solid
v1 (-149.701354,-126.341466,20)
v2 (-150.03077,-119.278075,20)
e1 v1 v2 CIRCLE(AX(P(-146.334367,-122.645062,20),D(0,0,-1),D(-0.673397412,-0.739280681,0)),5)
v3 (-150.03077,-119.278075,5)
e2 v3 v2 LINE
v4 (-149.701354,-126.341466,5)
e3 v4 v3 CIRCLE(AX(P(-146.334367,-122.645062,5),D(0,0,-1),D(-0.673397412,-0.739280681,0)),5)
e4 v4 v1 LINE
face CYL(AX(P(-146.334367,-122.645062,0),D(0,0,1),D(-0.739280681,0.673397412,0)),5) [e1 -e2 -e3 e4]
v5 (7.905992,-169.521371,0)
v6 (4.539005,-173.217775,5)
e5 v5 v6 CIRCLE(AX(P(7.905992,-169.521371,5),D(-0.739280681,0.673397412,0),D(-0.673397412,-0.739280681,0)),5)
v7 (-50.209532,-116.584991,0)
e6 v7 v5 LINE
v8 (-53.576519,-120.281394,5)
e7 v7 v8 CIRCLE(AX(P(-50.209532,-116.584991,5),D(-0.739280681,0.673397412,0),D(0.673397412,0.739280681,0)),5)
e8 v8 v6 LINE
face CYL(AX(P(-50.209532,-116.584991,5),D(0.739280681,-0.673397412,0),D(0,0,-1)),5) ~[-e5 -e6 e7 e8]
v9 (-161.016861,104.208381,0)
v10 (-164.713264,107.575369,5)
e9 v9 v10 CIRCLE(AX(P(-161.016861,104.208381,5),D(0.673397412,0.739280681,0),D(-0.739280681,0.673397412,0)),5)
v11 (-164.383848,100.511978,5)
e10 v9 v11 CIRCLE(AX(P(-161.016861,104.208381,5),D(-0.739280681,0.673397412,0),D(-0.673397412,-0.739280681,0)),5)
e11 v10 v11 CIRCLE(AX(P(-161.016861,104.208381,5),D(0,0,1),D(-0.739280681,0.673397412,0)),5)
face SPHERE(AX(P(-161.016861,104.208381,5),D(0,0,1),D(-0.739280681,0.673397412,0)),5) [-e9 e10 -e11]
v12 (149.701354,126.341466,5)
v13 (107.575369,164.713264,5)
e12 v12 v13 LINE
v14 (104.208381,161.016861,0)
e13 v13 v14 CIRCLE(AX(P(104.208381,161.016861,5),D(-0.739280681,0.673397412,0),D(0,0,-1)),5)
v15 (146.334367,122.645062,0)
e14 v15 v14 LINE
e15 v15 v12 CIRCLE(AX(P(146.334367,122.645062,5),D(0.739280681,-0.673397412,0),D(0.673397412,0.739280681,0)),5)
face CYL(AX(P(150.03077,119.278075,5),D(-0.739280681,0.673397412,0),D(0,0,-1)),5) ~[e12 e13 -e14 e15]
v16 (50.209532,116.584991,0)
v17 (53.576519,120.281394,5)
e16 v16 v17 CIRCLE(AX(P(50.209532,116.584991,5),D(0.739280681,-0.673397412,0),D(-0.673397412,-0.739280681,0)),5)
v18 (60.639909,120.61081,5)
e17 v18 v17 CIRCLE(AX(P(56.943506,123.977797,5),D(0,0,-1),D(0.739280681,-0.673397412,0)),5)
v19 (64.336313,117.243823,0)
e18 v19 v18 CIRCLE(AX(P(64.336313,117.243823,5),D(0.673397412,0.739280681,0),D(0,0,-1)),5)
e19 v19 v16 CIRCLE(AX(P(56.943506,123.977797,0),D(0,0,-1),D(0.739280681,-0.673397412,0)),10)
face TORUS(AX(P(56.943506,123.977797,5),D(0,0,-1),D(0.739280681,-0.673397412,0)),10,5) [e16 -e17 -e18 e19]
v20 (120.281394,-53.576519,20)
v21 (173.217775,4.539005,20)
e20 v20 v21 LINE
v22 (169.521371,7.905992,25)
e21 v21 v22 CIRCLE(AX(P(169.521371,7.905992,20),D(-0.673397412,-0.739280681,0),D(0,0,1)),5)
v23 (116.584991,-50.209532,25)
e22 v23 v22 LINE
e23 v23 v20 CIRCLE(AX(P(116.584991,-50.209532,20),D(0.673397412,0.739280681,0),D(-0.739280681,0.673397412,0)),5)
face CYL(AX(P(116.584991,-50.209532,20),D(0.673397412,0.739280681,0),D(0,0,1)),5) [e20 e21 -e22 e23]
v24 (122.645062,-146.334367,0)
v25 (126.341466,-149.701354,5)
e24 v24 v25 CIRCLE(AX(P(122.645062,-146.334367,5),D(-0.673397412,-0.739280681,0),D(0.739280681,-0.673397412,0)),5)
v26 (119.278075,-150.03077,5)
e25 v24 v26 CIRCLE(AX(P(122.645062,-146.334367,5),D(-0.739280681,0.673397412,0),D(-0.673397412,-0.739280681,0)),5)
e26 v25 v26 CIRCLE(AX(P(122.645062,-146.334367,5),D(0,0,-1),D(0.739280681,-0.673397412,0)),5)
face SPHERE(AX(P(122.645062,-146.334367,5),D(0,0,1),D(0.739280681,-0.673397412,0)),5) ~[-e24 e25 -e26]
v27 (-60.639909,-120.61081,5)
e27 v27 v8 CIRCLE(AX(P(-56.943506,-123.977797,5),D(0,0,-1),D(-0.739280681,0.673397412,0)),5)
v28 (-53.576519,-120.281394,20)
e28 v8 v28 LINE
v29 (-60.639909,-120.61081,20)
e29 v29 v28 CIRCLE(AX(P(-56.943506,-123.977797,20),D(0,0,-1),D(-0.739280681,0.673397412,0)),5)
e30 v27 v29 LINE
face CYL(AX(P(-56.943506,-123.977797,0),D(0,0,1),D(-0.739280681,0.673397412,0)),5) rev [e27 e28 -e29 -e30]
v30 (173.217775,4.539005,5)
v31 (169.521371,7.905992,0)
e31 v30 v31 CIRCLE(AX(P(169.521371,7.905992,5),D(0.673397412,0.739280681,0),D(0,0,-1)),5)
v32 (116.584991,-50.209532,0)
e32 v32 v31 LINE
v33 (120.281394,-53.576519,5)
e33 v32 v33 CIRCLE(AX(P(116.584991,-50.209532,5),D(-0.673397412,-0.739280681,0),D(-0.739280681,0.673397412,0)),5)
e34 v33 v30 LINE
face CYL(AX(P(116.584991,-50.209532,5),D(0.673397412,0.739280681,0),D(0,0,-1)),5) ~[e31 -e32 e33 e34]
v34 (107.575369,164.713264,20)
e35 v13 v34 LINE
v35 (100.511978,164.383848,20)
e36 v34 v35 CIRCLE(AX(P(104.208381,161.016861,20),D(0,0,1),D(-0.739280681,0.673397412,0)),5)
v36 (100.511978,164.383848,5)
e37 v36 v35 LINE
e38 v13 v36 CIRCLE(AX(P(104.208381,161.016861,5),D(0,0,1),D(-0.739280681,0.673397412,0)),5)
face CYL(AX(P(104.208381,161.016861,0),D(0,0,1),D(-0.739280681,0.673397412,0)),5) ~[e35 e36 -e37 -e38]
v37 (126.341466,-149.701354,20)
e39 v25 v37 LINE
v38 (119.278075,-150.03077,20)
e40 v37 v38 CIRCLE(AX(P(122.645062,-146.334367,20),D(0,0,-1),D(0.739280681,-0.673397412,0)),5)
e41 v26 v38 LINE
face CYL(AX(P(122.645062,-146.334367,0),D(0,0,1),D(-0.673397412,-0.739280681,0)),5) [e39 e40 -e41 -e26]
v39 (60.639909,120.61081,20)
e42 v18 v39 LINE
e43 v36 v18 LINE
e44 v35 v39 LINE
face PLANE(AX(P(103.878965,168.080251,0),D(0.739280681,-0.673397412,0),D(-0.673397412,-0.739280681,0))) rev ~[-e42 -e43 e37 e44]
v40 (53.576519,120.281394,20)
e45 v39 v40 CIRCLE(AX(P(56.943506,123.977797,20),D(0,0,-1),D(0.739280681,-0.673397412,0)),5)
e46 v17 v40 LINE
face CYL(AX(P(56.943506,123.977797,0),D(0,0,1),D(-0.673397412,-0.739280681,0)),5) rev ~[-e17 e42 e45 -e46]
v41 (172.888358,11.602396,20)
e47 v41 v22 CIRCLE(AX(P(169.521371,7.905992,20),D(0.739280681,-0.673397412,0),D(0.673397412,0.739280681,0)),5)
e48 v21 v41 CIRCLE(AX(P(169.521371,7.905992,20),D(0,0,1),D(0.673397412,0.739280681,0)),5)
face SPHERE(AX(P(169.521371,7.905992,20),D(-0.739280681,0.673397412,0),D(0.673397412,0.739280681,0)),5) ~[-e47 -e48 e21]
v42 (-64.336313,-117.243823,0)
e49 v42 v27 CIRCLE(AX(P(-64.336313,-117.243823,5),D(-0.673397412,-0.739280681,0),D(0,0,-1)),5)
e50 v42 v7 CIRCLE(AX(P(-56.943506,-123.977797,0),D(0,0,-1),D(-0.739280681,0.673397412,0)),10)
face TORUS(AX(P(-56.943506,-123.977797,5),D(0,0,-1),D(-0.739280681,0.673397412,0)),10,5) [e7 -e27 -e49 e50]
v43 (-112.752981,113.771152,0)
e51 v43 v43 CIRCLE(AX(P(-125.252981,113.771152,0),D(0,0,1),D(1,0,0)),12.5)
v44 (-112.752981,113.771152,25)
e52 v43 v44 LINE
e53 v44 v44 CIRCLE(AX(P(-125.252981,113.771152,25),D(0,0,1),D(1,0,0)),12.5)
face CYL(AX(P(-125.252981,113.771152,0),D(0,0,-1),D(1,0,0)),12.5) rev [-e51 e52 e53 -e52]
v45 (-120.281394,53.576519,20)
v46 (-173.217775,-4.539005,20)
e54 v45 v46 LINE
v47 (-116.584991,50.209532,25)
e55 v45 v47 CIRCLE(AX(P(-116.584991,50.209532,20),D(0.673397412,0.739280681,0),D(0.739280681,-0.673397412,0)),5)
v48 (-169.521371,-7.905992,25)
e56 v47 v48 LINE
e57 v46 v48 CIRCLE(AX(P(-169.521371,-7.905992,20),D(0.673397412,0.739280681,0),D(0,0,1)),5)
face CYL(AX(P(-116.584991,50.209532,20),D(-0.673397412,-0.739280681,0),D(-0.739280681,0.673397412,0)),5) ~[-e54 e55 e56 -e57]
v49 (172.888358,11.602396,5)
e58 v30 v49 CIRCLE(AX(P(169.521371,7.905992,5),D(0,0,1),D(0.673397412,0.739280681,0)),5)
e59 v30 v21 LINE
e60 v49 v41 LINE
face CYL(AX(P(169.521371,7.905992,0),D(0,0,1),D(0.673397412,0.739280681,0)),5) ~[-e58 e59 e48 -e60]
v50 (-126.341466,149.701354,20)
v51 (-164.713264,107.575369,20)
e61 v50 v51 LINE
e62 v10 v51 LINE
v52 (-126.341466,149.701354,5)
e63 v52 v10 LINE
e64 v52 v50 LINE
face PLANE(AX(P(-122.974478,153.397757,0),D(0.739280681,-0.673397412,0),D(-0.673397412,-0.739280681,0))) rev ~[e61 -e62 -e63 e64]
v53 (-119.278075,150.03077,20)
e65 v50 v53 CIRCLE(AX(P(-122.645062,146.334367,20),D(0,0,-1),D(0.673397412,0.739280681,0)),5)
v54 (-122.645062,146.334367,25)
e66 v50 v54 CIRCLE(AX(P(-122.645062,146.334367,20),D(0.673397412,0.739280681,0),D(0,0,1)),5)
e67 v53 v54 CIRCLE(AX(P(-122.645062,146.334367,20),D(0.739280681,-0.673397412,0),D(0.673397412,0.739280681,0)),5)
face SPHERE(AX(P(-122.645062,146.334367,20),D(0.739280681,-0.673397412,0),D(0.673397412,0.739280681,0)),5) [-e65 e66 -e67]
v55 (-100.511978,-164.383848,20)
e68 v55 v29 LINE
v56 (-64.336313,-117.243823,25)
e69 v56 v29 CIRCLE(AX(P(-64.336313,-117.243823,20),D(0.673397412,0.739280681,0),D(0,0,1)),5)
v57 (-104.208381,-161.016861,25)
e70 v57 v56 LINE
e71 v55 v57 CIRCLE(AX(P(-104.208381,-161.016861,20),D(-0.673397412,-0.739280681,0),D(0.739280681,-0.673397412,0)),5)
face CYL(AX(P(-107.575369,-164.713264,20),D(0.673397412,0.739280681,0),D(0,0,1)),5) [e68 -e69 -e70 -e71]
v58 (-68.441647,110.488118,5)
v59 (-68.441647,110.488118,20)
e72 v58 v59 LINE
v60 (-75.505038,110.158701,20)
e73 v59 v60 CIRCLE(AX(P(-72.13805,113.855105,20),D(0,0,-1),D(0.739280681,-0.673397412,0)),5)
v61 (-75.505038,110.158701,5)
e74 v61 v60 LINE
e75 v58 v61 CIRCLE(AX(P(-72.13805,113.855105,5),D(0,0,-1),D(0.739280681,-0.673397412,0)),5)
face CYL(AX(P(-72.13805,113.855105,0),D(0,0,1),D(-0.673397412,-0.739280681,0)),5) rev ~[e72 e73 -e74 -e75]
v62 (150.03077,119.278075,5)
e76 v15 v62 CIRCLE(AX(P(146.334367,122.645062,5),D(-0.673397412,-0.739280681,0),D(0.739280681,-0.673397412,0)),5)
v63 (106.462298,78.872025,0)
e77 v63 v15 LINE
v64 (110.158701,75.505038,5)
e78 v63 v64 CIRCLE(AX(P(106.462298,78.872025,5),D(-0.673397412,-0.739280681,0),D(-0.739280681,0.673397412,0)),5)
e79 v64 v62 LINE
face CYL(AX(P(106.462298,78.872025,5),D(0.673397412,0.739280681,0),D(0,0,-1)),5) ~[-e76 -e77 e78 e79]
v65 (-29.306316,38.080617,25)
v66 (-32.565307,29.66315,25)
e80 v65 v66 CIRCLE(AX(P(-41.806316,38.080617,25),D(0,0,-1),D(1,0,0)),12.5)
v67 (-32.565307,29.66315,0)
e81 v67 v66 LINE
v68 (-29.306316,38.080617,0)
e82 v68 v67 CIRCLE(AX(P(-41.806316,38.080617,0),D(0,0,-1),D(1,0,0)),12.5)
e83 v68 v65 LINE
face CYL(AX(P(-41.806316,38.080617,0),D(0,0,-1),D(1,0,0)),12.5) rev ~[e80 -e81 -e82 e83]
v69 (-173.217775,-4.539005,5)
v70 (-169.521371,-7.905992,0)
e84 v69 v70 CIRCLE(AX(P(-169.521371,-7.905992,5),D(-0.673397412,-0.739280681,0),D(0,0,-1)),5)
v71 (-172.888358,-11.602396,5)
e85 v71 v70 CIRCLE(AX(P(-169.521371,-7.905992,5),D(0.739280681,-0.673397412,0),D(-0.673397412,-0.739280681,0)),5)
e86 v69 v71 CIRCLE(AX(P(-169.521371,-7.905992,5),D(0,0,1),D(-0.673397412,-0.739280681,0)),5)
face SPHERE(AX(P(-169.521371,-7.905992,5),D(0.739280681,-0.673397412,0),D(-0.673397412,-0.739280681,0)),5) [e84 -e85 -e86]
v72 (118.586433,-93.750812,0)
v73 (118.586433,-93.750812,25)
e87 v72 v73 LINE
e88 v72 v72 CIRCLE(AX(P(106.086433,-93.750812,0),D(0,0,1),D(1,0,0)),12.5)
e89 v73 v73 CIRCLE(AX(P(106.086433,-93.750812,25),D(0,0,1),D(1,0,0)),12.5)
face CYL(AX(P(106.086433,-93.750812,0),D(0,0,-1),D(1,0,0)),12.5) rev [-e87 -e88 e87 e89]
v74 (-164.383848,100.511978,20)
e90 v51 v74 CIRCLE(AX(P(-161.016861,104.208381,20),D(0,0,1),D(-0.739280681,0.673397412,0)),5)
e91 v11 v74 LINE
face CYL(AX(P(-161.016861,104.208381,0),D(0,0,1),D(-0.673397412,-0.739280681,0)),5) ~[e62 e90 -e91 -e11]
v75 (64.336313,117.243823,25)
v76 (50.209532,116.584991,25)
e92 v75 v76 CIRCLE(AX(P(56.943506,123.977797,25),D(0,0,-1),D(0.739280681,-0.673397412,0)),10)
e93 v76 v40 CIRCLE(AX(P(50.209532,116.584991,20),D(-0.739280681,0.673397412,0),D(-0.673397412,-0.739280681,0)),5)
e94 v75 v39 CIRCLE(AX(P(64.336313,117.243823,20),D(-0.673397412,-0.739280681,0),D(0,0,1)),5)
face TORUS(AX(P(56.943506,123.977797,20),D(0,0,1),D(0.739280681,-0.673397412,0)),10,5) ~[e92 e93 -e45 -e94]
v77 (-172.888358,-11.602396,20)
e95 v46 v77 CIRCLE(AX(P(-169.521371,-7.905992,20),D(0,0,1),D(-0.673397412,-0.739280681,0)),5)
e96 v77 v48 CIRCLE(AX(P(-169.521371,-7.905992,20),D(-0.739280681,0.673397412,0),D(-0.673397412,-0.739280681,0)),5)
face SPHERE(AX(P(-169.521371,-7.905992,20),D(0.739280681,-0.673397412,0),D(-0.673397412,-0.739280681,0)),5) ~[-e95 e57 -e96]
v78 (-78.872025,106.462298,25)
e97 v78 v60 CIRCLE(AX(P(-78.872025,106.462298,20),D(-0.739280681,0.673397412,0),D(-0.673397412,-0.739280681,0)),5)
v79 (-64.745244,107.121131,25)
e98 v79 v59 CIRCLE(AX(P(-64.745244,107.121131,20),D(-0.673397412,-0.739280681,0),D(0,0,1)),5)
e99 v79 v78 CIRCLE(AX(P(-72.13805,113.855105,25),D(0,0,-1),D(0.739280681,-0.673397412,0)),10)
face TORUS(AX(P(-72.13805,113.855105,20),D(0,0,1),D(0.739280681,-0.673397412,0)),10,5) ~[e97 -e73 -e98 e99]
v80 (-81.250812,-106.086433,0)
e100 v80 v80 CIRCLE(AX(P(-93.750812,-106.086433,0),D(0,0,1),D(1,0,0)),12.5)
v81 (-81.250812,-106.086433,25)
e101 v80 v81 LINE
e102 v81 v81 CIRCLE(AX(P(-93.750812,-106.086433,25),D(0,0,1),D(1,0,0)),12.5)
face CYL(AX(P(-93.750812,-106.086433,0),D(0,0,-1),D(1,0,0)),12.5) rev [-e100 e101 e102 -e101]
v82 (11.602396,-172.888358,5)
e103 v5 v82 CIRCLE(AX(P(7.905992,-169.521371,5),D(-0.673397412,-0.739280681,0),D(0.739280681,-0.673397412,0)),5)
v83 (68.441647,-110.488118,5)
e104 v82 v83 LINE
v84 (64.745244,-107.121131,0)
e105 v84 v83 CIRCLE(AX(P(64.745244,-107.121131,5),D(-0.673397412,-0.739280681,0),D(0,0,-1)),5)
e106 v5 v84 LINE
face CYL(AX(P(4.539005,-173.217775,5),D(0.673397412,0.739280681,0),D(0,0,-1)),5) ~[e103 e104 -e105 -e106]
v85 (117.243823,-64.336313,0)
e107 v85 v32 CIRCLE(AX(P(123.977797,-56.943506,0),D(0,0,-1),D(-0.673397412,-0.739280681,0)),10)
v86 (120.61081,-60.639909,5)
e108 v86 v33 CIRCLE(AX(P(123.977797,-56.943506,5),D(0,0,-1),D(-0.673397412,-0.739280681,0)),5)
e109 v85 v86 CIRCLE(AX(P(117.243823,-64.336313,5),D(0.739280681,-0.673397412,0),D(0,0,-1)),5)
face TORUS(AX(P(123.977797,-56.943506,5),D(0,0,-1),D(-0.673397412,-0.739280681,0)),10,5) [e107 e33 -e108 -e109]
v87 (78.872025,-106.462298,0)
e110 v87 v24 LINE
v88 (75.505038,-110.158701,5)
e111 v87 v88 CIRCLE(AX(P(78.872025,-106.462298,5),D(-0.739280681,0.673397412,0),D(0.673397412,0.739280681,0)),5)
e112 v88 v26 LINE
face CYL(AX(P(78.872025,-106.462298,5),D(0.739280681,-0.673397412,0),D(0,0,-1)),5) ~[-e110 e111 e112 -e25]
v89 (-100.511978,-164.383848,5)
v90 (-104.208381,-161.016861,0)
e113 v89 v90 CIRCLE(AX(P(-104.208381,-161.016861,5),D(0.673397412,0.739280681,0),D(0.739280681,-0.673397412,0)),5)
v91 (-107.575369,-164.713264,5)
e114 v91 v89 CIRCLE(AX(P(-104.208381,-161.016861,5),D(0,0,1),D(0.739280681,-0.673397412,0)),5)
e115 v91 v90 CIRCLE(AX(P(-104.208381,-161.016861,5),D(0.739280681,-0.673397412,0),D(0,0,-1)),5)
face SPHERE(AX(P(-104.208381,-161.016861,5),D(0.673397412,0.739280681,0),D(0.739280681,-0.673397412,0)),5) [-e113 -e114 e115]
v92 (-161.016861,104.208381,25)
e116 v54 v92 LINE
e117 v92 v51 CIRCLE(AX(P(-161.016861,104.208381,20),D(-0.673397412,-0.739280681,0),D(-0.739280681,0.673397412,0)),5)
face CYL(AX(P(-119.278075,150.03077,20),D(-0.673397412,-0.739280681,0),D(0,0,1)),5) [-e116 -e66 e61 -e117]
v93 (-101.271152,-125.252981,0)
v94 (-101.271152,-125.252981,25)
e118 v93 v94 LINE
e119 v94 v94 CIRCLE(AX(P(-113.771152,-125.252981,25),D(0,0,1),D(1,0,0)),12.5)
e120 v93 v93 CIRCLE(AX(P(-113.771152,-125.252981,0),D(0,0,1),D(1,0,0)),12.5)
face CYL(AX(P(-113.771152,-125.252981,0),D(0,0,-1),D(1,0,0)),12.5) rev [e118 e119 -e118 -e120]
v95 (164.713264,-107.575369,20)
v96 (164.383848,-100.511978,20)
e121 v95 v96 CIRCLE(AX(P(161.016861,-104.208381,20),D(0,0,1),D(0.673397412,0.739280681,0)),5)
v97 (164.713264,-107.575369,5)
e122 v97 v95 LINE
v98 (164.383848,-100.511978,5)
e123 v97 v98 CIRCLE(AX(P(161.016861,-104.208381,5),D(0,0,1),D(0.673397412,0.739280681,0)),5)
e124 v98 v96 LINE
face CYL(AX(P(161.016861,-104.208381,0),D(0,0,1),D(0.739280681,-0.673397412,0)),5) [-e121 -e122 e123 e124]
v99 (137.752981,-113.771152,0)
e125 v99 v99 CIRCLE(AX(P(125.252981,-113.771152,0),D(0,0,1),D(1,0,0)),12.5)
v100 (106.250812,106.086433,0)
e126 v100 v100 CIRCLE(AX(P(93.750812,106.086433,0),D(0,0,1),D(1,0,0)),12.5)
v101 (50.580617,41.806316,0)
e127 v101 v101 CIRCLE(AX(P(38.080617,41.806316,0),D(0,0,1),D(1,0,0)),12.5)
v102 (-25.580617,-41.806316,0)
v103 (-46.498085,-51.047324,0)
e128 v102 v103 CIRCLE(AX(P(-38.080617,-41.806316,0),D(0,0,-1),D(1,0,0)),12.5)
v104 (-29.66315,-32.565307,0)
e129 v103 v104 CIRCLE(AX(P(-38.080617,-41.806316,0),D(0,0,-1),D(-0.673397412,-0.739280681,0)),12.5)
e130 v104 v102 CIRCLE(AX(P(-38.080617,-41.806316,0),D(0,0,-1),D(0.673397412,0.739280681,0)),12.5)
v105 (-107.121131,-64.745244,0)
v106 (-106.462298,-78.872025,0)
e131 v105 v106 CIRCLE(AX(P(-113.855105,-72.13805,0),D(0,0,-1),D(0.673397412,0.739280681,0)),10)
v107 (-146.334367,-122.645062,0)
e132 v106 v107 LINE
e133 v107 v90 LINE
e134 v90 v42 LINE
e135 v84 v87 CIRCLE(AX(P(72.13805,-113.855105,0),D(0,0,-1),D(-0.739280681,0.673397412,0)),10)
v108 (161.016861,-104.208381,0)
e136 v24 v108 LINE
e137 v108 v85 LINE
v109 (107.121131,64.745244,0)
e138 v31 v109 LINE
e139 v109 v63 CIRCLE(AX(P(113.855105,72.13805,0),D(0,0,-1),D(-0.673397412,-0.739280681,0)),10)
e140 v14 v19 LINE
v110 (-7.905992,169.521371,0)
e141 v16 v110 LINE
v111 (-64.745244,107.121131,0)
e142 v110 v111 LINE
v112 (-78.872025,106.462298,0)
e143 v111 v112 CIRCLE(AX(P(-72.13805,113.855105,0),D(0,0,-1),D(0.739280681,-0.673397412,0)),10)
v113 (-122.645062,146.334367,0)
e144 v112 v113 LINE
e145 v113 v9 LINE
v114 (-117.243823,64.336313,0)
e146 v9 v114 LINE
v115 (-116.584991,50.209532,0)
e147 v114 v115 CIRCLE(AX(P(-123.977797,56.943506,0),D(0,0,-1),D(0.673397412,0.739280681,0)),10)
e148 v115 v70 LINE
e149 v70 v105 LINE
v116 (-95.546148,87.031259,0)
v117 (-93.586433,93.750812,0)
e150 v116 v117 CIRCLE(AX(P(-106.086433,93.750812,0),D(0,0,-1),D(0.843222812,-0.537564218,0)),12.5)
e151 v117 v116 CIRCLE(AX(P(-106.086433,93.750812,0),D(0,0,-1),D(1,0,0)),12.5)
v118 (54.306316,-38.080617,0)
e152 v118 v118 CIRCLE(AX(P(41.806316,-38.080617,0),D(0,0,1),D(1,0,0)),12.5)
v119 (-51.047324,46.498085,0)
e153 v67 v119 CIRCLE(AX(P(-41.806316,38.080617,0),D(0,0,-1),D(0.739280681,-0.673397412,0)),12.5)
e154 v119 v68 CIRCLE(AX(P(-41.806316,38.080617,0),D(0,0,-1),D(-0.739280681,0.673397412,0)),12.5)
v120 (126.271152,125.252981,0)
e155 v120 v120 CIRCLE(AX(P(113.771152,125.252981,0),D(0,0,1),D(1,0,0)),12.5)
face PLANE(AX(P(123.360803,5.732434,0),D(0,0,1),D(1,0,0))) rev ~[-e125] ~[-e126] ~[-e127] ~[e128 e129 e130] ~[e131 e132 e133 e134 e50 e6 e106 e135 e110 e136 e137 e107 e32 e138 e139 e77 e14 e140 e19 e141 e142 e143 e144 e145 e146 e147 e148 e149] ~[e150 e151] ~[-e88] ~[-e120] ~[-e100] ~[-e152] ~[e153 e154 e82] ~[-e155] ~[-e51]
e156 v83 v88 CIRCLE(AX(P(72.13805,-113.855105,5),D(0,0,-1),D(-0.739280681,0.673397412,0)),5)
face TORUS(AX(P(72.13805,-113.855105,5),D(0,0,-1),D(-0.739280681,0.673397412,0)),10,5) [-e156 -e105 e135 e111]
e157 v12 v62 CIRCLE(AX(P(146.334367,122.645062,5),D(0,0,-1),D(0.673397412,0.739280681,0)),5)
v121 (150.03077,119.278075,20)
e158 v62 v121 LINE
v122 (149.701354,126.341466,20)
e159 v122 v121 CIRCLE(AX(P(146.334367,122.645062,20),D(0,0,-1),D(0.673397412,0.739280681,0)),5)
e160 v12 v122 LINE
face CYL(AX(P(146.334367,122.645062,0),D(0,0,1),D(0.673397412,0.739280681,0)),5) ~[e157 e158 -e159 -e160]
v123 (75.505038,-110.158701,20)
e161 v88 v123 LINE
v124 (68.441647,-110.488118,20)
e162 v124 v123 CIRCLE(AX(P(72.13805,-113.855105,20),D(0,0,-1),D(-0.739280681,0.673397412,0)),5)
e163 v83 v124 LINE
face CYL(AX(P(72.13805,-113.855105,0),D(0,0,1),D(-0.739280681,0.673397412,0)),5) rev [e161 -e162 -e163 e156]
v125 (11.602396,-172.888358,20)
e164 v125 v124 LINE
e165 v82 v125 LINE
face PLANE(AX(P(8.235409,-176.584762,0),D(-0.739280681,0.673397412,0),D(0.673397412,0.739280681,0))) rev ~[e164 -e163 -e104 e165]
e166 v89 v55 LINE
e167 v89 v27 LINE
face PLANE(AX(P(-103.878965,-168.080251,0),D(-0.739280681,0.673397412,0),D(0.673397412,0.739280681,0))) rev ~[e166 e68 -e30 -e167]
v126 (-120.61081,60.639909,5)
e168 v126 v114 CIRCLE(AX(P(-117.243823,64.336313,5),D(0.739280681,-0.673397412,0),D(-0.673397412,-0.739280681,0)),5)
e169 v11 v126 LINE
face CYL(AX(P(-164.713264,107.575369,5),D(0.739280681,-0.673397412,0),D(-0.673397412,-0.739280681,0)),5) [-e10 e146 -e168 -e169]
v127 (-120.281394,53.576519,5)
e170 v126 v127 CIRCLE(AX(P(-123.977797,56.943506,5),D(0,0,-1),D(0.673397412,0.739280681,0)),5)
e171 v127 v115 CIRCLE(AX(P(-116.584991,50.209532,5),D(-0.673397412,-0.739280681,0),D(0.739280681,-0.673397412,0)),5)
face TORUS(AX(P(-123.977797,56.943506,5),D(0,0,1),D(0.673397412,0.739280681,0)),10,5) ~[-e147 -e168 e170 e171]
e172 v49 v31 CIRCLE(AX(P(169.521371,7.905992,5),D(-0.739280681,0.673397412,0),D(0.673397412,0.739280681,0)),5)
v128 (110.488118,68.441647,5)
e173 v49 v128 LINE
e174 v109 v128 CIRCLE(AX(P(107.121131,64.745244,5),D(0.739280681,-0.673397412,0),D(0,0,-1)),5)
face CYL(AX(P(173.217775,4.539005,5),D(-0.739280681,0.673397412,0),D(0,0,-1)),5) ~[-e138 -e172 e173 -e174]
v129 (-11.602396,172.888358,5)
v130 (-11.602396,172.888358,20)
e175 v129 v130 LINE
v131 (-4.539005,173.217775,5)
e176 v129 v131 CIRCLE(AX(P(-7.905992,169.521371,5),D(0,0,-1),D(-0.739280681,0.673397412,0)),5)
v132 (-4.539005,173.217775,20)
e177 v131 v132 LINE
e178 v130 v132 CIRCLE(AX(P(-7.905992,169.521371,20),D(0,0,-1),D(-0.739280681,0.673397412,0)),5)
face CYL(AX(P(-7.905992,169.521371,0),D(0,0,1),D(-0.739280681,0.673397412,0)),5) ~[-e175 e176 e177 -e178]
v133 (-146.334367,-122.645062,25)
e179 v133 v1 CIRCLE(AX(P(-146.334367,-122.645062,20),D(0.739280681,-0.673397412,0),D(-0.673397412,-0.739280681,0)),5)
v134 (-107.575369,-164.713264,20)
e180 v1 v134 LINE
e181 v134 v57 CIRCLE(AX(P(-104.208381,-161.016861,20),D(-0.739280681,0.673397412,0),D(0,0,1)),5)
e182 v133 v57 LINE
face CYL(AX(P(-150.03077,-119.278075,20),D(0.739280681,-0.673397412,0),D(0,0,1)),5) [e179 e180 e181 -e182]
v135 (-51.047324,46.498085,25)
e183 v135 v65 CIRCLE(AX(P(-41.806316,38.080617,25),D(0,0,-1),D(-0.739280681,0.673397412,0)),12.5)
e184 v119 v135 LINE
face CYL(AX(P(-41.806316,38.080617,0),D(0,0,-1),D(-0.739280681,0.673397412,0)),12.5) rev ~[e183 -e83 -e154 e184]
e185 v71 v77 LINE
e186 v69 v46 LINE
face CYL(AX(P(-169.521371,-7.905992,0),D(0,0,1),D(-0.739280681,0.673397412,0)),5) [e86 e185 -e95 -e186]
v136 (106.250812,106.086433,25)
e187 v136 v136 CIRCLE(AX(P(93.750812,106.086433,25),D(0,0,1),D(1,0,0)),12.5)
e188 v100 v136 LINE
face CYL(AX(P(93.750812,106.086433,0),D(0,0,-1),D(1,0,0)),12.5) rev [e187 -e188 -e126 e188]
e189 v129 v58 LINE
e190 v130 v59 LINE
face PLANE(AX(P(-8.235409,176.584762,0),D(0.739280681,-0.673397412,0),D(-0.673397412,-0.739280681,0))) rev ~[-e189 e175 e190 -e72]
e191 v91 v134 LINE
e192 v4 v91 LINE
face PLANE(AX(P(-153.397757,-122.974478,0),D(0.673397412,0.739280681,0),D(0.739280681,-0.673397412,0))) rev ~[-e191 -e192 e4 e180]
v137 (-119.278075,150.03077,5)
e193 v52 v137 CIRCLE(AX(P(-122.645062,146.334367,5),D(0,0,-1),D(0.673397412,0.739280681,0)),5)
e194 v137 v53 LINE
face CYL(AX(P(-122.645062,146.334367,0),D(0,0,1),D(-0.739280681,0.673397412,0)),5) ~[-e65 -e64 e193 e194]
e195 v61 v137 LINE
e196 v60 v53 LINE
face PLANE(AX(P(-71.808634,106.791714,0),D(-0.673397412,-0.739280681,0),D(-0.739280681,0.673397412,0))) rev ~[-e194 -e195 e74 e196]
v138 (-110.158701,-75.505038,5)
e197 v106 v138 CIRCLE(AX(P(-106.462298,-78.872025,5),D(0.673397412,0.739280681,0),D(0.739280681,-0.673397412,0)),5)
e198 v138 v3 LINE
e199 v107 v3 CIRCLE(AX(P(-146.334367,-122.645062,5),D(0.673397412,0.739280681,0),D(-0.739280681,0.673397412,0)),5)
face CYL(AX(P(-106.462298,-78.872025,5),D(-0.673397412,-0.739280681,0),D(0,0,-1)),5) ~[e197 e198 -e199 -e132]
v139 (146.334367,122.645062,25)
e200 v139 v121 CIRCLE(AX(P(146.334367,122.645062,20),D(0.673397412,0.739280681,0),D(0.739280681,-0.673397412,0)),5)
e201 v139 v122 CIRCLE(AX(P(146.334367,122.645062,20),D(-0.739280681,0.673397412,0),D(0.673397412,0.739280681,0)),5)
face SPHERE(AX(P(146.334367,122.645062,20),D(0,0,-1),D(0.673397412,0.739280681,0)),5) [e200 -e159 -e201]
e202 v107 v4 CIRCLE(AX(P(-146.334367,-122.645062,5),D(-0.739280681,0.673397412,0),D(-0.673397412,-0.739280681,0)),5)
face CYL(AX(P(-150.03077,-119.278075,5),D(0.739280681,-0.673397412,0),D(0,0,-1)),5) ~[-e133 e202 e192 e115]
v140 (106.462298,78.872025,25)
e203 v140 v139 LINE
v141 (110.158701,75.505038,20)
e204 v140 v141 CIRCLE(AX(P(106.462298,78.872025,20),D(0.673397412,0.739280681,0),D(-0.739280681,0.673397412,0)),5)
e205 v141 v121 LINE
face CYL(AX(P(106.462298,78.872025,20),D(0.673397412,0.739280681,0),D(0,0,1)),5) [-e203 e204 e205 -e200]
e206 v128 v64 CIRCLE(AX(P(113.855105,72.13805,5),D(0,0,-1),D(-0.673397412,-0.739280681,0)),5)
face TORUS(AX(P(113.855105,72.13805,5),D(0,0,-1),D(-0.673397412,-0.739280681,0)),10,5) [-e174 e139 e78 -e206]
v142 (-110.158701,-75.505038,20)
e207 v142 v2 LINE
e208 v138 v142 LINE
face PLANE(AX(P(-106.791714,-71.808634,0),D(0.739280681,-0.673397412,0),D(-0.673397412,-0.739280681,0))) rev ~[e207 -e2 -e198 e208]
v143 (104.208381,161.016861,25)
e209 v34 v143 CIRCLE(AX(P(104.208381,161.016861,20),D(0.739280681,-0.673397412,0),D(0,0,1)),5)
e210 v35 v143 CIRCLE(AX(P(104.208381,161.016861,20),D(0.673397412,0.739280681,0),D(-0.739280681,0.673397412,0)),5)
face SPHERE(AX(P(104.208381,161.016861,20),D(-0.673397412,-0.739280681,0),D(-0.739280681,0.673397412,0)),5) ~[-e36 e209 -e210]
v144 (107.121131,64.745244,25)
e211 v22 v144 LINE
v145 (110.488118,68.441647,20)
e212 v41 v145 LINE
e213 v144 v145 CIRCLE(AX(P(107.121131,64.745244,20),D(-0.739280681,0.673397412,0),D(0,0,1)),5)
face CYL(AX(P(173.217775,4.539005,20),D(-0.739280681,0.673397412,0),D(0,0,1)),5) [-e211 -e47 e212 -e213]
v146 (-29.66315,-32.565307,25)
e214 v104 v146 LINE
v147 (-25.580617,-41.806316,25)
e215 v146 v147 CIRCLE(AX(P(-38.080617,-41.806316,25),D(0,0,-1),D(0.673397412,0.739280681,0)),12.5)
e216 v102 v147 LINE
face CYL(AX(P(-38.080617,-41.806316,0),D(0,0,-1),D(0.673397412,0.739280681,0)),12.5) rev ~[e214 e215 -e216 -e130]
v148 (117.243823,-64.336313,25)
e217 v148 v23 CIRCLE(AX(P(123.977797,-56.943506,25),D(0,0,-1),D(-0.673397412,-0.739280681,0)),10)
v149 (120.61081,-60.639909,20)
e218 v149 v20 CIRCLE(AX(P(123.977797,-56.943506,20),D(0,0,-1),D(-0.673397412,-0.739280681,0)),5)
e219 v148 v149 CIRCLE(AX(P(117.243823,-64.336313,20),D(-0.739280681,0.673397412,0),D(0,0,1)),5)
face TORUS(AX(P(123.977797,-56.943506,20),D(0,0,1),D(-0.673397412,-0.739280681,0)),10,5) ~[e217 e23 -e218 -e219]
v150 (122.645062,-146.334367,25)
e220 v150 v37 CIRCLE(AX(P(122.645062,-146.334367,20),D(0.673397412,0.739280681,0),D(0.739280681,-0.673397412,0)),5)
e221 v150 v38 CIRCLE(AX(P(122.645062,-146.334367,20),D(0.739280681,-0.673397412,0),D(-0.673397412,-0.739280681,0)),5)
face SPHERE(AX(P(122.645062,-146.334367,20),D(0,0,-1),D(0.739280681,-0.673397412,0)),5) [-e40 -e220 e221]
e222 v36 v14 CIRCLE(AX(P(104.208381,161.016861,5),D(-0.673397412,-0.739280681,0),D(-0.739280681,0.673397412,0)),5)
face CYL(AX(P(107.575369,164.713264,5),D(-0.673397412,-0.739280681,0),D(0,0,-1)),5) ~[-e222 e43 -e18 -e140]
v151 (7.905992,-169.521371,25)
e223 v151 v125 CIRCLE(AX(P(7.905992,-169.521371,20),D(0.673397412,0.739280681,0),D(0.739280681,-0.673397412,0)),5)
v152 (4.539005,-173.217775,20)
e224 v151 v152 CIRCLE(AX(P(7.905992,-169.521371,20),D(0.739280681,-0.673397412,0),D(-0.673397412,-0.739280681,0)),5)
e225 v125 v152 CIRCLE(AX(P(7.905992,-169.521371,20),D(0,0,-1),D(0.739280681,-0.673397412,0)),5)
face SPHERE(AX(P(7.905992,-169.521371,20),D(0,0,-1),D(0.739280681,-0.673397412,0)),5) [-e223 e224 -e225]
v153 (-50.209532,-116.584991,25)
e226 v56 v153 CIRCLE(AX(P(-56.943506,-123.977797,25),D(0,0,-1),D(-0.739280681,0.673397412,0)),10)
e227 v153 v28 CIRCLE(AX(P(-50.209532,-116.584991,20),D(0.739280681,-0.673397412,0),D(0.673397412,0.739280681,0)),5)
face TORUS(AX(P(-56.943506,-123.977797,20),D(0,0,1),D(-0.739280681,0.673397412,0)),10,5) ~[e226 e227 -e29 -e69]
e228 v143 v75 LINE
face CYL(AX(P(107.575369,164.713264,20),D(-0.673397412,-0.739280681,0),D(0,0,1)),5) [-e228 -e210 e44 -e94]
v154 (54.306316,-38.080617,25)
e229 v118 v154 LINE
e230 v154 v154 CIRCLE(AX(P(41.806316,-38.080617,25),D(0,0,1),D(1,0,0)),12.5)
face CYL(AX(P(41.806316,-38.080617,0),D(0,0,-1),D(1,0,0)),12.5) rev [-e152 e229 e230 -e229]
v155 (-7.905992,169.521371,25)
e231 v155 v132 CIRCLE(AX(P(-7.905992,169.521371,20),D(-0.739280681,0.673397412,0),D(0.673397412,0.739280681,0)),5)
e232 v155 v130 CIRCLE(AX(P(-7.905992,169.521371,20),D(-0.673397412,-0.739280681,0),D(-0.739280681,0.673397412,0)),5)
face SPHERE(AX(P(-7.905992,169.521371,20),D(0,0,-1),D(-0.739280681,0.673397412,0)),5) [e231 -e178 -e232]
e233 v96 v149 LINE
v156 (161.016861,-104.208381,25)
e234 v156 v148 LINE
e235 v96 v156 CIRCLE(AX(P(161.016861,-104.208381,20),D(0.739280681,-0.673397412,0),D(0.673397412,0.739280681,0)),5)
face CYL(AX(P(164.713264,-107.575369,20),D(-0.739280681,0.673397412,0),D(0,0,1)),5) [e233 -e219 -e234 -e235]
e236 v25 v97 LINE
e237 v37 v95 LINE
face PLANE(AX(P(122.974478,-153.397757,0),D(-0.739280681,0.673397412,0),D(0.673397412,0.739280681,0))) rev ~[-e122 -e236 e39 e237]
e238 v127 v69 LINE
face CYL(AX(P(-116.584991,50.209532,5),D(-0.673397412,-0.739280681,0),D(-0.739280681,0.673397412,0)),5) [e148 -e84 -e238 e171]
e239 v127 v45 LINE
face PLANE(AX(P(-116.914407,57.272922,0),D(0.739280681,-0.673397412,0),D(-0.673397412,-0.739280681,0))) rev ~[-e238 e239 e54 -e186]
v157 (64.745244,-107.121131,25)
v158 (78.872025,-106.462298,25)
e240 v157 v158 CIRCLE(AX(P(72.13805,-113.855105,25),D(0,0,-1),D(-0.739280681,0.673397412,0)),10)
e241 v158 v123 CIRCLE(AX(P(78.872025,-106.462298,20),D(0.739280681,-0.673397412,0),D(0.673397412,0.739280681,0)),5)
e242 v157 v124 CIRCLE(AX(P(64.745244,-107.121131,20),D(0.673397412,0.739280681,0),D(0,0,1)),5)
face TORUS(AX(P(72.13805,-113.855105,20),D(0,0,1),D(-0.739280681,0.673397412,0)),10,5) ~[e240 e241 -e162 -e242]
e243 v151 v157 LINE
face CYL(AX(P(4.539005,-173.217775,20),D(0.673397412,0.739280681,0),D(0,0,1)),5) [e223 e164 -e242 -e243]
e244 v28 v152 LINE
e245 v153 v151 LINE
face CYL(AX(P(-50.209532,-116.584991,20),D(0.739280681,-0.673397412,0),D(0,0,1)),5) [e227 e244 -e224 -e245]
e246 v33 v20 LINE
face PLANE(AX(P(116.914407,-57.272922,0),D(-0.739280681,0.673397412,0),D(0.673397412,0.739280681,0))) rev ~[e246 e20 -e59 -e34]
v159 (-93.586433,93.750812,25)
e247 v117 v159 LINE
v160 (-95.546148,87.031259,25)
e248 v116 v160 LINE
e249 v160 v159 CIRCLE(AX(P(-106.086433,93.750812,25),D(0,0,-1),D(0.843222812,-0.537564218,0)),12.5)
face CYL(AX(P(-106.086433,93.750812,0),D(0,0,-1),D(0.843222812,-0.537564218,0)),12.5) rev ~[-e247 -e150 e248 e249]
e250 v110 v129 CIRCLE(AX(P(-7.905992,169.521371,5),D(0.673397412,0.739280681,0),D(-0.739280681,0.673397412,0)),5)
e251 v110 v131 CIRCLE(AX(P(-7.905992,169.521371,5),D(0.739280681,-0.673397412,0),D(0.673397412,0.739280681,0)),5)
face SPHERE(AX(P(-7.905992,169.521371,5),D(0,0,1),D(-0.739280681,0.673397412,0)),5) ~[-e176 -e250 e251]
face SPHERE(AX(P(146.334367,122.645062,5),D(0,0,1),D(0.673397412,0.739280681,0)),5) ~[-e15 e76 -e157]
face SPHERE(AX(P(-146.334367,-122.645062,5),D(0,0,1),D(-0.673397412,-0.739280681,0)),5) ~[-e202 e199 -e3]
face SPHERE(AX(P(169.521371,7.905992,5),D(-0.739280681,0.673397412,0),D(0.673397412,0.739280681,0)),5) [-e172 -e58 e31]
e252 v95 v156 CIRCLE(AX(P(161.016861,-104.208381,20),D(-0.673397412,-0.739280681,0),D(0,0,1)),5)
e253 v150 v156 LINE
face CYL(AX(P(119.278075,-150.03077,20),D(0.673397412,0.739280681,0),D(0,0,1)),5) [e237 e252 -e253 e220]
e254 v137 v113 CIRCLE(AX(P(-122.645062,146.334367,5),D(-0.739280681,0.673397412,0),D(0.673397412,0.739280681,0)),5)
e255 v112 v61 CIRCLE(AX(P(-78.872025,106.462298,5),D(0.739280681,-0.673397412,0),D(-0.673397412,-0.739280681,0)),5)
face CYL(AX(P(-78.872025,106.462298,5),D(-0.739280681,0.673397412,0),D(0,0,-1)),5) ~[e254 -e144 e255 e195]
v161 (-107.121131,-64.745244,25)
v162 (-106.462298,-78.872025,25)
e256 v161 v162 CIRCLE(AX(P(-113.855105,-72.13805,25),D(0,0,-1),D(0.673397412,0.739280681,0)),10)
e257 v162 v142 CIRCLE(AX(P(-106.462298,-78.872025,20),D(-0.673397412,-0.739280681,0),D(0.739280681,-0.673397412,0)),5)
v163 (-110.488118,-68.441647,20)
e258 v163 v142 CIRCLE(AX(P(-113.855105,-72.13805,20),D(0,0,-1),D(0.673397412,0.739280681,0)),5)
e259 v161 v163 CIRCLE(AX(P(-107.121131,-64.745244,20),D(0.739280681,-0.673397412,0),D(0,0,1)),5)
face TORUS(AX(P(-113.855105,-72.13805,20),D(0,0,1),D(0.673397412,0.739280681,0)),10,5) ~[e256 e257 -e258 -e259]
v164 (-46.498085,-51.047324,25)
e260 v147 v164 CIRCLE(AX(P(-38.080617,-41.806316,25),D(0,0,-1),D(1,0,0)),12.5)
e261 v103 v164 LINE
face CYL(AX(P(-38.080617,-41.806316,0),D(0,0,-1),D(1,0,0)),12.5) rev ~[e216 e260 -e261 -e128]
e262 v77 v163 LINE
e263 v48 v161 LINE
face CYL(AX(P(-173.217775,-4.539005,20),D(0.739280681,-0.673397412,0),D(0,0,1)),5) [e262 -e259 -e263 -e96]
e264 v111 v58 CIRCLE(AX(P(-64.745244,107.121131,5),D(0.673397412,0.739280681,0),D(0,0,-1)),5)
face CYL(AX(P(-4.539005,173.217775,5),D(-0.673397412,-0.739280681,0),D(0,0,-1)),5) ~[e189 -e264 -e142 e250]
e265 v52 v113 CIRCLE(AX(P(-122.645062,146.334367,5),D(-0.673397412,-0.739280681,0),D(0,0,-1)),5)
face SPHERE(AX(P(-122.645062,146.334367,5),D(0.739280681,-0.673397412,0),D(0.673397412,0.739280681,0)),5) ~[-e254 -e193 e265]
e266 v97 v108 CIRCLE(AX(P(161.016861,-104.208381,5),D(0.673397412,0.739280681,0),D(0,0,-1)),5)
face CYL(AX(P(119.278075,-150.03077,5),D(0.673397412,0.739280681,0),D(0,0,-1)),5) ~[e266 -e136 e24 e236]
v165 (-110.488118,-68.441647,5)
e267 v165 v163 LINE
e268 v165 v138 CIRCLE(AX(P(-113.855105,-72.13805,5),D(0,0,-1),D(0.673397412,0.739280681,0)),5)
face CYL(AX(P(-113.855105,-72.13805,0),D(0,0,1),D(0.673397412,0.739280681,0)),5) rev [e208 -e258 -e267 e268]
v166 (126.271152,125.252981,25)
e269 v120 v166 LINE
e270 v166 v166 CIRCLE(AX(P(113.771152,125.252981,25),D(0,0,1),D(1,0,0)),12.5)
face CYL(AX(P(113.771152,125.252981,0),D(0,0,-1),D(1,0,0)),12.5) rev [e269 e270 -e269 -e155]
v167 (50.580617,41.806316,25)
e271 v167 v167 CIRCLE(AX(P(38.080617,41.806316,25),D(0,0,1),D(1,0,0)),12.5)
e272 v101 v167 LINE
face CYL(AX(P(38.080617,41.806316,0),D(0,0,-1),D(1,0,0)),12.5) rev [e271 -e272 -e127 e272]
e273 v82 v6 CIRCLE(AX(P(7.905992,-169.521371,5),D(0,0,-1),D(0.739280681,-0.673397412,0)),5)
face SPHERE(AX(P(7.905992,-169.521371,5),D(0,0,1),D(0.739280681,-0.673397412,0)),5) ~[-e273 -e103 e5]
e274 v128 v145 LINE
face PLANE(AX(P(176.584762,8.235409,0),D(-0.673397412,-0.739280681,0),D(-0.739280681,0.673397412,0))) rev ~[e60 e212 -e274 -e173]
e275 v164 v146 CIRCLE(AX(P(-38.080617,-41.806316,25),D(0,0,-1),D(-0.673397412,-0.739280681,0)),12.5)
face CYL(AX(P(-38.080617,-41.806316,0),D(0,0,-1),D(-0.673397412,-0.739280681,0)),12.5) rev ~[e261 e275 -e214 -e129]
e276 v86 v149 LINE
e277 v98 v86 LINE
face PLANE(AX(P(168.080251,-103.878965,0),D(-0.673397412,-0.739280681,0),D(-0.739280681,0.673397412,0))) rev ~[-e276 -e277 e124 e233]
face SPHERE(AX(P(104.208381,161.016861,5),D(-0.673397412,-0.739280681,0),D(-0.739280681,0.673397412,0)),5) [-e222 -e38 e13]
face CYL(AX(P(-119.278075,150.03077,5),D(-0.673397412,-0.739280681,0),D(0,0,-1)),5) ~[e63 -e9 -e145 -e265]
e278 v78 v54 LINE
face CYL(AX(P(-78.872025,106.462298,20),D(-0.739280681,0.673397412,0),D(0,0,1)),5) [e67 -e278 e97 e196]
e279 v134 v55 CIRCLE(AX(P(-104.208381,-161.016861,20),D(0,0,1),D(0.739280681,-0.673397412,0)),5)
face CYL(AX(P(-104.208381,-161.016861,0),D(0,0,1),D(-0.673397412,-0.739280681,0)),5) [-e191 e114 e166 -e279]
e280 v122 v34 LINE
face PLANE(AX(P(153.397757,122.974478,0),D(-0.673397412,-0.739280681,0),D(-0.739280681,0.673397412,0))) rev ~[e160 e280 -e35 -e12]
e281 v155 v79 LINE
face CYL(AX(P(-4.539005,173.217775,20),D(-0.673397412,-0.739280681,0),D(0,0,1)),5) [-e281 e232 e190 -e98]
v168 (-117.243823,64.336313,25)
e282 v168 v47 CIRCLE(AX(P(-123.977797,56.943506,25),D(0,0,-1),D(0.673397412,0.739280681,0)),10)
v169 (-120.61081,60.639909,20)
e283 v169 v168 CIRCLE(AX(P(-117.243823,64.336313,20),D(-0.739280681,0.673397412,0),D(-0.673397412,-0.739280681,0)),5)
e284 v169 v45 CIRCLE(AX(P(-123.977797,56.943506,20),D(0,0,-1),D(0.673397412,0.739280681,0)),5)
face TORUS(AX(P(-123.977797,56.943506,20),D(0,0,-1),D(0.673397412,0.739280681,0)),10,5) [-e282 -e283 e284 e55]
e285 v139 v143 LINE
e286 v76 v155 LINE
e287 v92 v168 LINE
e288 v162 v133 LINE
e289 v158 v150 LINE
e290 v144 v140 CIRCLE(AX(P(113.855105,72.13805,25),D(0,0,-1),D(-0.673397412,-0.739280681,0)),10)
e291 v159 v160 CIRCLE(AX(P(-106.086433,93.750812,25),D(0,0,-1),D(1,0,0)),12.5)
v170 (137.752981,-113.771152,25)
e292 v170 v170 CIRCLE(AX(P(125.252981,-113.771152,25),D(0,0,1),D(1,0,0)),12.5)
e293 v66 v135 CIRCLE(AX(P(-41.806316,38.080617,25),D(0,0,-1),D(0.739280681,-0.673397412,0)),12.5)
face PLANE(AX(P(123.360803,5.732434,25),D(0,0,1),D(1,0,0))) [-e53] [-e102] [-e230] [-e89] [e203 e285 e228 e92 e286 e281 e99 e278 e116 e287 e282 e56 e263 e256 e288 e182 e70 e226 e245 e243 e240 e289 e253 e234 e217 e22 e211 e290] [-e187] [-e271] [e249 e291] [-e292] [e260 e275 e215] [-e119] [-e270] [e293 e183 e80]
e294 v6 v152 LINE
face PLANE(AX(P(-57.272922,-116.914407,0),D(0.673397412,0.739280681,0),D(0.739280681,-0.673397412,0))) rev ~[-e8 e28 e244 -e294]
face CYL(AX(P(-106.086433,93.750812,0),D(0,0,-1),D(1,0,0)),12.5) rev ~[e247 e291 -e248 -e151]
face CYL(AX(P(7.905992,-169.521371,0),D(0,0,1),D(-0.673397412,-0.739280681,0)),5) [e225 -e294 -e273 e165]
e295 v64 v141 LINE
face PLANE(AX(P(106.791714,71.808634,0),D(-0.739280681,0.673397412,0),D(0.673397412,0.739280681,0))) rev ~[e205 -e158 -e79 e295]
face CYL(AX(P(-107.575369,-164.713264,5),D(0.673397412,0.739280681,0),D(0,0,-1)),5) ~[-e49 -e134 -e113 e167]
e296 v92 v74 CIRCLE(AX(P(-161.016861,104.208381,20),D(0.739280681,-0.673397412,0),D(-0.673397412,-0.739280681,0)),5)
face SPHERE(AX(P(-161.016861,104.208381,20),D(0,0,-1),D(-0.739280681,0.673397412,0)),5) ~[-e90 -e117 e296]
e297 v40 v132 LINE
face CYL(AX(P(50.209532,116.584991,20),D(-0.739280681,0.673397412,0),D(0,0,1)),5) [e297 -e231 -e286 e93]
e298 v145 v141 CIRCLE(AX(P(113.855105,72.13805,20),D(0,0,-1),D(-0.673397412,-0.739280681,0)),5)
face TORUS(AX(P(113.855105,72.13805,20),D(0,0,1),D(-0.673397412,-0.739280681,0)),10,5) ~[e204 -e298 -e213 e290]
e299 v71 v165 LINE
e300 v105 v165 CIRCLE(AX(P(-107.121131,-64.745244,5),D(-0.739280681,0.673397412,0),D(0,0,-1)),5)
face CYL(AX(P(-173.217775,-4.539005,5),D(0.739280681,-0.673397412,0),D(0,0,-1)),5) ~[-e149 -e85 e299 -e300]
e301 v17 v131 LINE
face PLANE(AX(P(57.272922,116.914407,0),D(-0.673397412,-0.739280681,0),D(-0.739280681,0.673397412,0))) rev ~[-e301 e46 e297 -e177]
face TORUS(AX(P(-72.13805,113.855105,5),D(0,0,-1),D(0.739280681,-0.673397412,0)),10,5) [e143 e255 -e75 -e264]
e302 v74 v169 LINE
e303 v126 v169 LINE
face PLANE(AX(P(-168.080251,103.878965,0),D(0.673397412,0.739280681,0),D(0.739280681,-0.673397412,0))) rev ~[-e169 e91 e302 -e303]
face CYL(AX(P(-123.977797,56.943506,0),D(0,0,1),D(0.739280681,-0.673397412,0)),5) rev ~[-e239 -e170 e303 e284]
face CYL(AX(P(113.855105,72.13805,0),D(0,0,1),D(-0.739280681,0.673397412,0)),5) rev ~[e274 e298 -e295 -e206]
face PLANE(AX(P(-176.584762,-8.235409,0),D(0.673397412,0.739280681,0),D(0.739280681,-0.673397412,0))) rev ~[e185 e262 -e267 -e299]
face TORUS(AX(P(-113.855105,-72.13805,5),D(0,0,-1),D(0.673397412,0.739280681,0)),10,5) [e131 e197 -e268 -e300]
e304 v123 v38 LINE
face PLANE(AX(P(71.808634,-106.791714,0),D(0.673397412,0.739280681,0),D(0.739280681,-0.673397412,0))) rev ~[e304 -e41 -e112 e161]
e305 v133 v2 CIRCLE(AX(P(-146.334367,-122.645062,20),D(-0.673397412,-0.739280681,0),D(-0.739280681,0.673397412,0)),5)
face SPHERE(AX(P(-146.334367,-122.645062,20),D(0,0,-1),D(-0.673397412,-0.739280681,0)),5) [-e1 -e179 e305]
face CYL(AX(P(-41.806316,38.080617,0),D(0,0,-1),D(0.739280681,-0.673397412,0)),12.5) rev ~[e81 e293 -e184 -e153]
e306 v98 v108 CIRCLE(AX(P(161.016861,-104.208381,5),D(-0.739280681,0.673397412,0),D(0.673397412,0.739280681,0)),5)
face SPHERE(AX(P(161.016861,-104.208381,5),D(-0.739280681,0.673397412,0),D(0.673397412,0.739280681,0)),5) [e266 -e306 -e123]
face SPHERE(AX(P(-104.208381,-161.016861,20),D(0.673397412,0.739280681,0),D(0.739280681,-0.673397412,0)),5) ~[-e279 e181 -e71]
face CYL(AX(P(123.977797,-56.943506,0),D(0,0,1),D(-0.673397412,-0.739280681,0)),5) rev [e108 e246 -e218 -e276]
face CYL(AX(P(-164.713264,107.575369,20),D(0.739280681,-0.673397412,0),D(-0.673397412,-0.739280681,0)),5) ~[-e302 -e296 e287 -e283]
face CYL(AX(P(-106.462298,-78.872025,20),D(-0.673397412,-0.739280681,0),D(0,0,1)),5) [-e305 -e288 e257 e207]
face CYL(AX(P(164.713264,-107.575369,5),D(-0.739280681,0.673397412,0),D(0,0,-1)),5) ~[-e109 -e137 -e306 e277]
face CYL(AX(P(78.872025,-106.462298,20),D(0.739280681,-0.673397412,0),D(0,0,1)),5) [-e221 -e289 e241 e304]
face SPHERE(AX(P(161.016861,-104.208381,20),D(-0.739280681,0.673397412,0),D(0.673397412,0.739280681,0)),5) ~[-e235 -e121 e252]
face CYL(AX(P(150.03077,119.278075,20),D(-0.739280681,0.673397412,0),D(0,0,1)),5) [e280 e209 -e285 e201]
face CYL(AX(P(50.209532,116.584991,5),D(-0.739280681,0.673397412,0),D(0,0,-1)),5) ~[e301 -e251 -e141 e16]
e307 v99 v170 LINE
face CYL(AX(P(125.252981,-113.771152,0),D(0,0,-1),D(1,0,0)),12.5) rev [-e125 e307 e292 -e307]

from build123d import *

# Parameters (mm, degrees)
F0_R     = 12.5
F1_DEPTH = 25
F2_F1_R  = 5
F2_F2_R  = 5


with BuildPart() as f1:
    # F0 (on Top) → F1 (new body)
    with BuildSketch(Plane.XY):
        with BuildLine():
            ThreePointArc((84.1746765519, 92.4100850957), (114.3390453191, 50.5131934796), (125, 0))
            ThreePointArc((125, 0), (116.5681360927, -45.131692278), (92.410085634, -84.1746759609))
            Line((92.410085634, -84.1746759609), (116.9144070246, -57.2729221618))
            Line((116.9144070246, -57.2729221618), (176.5847616479, 8.2354085359))
            Line((176.5847616479, 8.2354085359), (106.7917142693, 71.8086341541))
            Line((106.7917142693, 71.8086341541), (84.1746765519, 92.4100850957))
        make_face()
        with BuildLine():
            ThreePointArc((-92.410085938, 84.1746756271), (-5.8233138519, 124.864282386), (84.1746765519, 92.4100850957))
            Line((84.1746765519, 92.4100850957), (57.2729221618, 116.9144070246))
            Line((57.2729221618, 116.9144070246), (-8.2354085359, 176.5847616479))
            Line((-8.2354085359, 176.5847616479), (-71.8086341541, 106.7917142693))
            Line((-71.8086341541, 106.7917142693), (-92.410085938, 84.1746756271))
        make_face()
        Polygon((57.2729221618, 116.9144070246), (84.1746765519, 92.4100850957), (106.7917142693, 71.8086341541), (153.3977572181, 122.9744784544), (103.8789651106, 168.0802513249), align=None)
        with Locations((93.7508121133, 106.0864329338)):
            Circle(F0_R, mode=Mode.SUBTRACT)
        with Locations((113.7711524508, 125.2529812725)):
            Circle(F0_R, mode=Mode.SUBTRACT)
        with BuildLine():
            Line((71.8086341541, -106.7917142693), (92.410085634, -84.1746759609))
            ThreePointArc((92.410085634, -84.1746759609), (5.8233127337, -124.8642824382), (-84.1746778733, -92.410083892))
            Line((-84.1746778733, -92.410083892), (-57.2729221618, -116.9144070246))
            Line((-57.2729221618, -116.9144070246), (8.2354085359, -176.5847616479))
            Line((8.2354085359, -176.5847616479), (71.8086341541, -106.7917142693))
        make_face()
        Polygon((116.9144070246, -57.2729221618), (92.410085634, -84.1746759609), (71.8086341541, -106.7917142693), (122.9744784544, -153.3977572181), (168.0802513249, -103.8789651106), align=None)
        with Locations((125.2529812725, -113.7711524508)):
            Circle(F0_R, mode=Mode.SUBTRACT)
        with Locations((106.0864329338, -93.7508121133)):
            Circle(F0_R, mode=Mode.SUBTRACT)
        with BuildLine():
            ThreePointArc((-84.1746778733, -92.410083892), (-124.8642824277, -5.8233129591), (-92.410085938, 84.1746756271))
            Line((-92.410085938, 84.1746756271), (-116.9144070246, 57.2729221618))
            Line((-116.9144070246, 57.2729221618), (-176.5847616479, -8.2354085359))
            Line((-176.5847616479, -8.2354085359), (-106.7917142693, -71.8086341541))
            Line((-106.7917142693, -71.8086341541), (-84.1746778733, -92.410083892))
        make_face()
        Polygon((-116.9144070246, 57.2729221618), (-92.410085938, 84.1746756271), (-71.8086341541, 106.7917142693), (-122.9744784544, 153.3977572181), (-168.0802513249, 103.8789651106), align=None)
        with BuildLine():
            ThreePointArc((-93.5864329338, 93.7508121133), (-94.086358675, 90.2510667249), (-95.5461477792, 87.0312593857))
            ThreePointArc((-95.5461477792, 87.0312593857), (-118.0865071926, 97.2505575017), (-93.5864329338, 93.7508121133))
        make_face(mode=Mode.SUBTRACT)
        with Locations((-125.2529812725, 113.7711524508)):
            Circle(F0_R, mode=Mode.SUBTRACT)
        Polygon((-57.2729221618, -116.9144070246), (-84.1746778733, -92.410083892), (-106.7917142693, -71.8086341541), (-153.3977572181, -122.9744784544), (-103.8789651106, -168.0802513249), align=None)
        with Locations((-113.7711524508, -125.2529812725)):
            Circle(F0_R, mode=Mode.SUBTRACT)
        with Locations((-93.7508121133, -106.0864329338)):
            Circle(F0_R, mode=Mode.SUBTRACT)
        with BuildLine():
            ThreePointArc((92.410085634, -84.1746759609), (116.5681360927, -45.131692278), (125, 0))
            ThreePointArc((125, 0), (114.3390453191, 50.5131934796), (84.1746765519, 92.4100850957))
            ThreePointArc((84.1746765519, 92.4100850957), (-5.8233138519, 124.864282386), (-92.410085938, 84.1746756271))
            ThreePointArc((-92.410085938, 84.1746756271), (-124.8642824277, -5.8233129591), (-84.1746778733, -92.410083892))
            ThreePointArc((-84.1746778733, -92.410083892), (5.8233127337, -124.8642824382), (92.410085634, -84.1746759609))
        make_face()
        with BuildLine():
            ThreePointArc((-46.4980849836, -51.0473240379), (-47.3216258372, -33.3888478731), (-29.6631496724, -32.5653070196))
            ThreePointArc((-29.6631496724, -32.5653070196), (-26.646712796, -36.754996181), (-25.580617328, -41.8063155288))
            ThreePointArc((-25.580617328, -41.8063155288), (-33.0292979803, -53.2402200608), (-46.4980849836, -51.0473240379))
        make_face(mode=Mode.SUBTRACT)
        with Locations((41.8063155288, -38.080617328)):
            Circle(F0_R, mode=Mode.SUBTRACT)
        with BuildLine():
            ThreePointArc((-32.5653070196, 29.6631496724), (-50.2237831844, 28.8396088188), (-51.0473240379, 46.4980849836))
            ThreePointArc((-51.0473240379, 46.4980849836), (-37.2931462634, 49.7374309227), (-29.3063155288, 38.080617328))
            ThreePointArc((-29.3063155288, 38.080617328), (-30.149501934, 33.5674480627), (-32.5653070196, 29.6631496724))
        make_face(mode=Mode.SUBTRACT)
        with Locations((38.080617328, 41.8063155288)):
            Circle(F0_R, mode=Mode.SUBTRACT)
    extrude(amount=F1_DEPTH)

    # F2: fillet of radius 5 on 56 edges, made by hand

    # F2_f1
    f2_f1_edges = [f1.edges().sort_by_distance(p)[0] for p in [
        (-71.8086341541, 106.7917142693, 12.5),
        (57.2729221618, 116.9144070246, 12.5),
        (106.7917142693, 71.8086341541, 12.5),
        (116.9144070246, -57.2729221618, 12.5),
        (71.8086341541, -106.7917142693, 12.5),
        (-57.2729221618, -116.9144070246, 12.5),
        (-106.7917142693, -71.8086341541, 12.5),
        (-116.9144070246, 57.2729221618, 12.5),
    ]]
    fillet(f2_f1_edges, radius=F2_F1_R)

    # F2_f2
    f2_f2_edges = [f1.edges().sort_by_distance(p)[0] for p in [
        (-8.2354085359, 176.5847616479, 12.5),
        (-38.3385278139, 143.5364396605, 0),
        (-38.3385278139, 143.5364396605, 25),
        (22.6705551112, 148.4330778674, 0),
        (22.6705551112, 148.4330778674, 25),
        (103.8789651106, 168.0802513249, 12.5),
        (82.2594371674, 144.3455308766, 0),
        (82.2594371674, 144.3455308766, 25),
        (-122.9744784544, 153.3977572181, 12.5),
        (-168.0802513249, 103.8789651106, 12.5),
        (-145.5273648897, 128.6383611644, 0),
        (-145.5273648897, 128.6383611644, 25),
        (153.3977572181, 122.9744784544, 12.5),
        (128.6383611644, 145.5273648897, 0),
        (128.6383611644, 145.5273648897, 25),
        (131.7782292749, 99.2397580061, 0),
        (131.7782292749, 99.2397580061, 25),
        (176.5847616479, 8.2354085359, 12.5),
        (148.4330778674, -22.6705551112, 0),
        (148.4330778674, -22.6705551112, 25),
        (143.5364396605, 38.3385278139, 0),
        (143.5364396605, 38.3385278139, 25),
        (168.0802513249, -103.8789651106, 12.5),
        (144.3455308766, -82.2594371674, 0),
        (144.3455308766, -82.2594371674, 25),
        (122.9744784544, -153.3977572181, 12.5),
        (145.5273648897, -128.6383611644, 0),
        (145.5273648897, -128.6383611644, 25),
        (8.2354085359, -176.5847616479, 12.5),
        (38.3385278139, -143.5364396605, 0),
        (38.3385278139, -143.5364396605, 25),
        (99.2397580061, -131.7782292749, 0),
        (99.2397580061, -131.7782292749, 25),
        (-22.6705551112, -148.4330778674, 0),
        (-22.6705551112, -148.4330778674, 25),
        (-103.8789651106, -168.0802513249, 12.5),
        (-82.2594371674, -144.3455308766, 0),
        (-82.2594371674, -144.3455308766, 25),
        (-153.3977572181, -122.9744784544, 12.5),
        (-128.6383611644, -145.5273648897, 0),
        (-128.6383611644, -145.5273648897, 25),
        (-131.7782292749, -99.2397580061, 0),
        (-131.7782292749, -99.2397580061, 25),
        (-176.5847616479, -8.2354085359, 12.5),
        (-143.5364396605, -38.3385278139, 0),
        (-143.5364396605, -38.3385278139, 25),
        (-148.4330778674, 22.6705551112, 0),
        (-148.4330778674, 22.6705551112, 25),
        (-118.9832261939, 57.1764383493, 25),
        (-118.9832261939, 57.1764383493, 0),
        (-108.8605334386, -71.9051179667, 25),
        (-108.8605334386, -71.9051179667, 0),
        (-57.1764383493, -118.9832261939, 25),
        (-57.1764383493, -118.9832261939, 0),
        (71.9051179667, -108.8605334386, 25),
        (71.9051179667, -108.8605334386, 0),
        (118.9832261939, -57.1764383493, 25),
        (118.9832261939, -57.1764383493, 0),
        (108.8605334386, 71.9051179667, 25),
        (108.8605334386, 71.9051179667, 0),
        (57.1764383493, 118.9832261939, 25),
        (57.1764383493, 118.9832261939, 0),
        (-71.9051179667, 108.8605334386, 25),
        (-71.9051179667, 108.8605334386, 0),
    ]]
    fillet(f2_f2_edges, radius=F2_F2_R)


solid = f1.part
